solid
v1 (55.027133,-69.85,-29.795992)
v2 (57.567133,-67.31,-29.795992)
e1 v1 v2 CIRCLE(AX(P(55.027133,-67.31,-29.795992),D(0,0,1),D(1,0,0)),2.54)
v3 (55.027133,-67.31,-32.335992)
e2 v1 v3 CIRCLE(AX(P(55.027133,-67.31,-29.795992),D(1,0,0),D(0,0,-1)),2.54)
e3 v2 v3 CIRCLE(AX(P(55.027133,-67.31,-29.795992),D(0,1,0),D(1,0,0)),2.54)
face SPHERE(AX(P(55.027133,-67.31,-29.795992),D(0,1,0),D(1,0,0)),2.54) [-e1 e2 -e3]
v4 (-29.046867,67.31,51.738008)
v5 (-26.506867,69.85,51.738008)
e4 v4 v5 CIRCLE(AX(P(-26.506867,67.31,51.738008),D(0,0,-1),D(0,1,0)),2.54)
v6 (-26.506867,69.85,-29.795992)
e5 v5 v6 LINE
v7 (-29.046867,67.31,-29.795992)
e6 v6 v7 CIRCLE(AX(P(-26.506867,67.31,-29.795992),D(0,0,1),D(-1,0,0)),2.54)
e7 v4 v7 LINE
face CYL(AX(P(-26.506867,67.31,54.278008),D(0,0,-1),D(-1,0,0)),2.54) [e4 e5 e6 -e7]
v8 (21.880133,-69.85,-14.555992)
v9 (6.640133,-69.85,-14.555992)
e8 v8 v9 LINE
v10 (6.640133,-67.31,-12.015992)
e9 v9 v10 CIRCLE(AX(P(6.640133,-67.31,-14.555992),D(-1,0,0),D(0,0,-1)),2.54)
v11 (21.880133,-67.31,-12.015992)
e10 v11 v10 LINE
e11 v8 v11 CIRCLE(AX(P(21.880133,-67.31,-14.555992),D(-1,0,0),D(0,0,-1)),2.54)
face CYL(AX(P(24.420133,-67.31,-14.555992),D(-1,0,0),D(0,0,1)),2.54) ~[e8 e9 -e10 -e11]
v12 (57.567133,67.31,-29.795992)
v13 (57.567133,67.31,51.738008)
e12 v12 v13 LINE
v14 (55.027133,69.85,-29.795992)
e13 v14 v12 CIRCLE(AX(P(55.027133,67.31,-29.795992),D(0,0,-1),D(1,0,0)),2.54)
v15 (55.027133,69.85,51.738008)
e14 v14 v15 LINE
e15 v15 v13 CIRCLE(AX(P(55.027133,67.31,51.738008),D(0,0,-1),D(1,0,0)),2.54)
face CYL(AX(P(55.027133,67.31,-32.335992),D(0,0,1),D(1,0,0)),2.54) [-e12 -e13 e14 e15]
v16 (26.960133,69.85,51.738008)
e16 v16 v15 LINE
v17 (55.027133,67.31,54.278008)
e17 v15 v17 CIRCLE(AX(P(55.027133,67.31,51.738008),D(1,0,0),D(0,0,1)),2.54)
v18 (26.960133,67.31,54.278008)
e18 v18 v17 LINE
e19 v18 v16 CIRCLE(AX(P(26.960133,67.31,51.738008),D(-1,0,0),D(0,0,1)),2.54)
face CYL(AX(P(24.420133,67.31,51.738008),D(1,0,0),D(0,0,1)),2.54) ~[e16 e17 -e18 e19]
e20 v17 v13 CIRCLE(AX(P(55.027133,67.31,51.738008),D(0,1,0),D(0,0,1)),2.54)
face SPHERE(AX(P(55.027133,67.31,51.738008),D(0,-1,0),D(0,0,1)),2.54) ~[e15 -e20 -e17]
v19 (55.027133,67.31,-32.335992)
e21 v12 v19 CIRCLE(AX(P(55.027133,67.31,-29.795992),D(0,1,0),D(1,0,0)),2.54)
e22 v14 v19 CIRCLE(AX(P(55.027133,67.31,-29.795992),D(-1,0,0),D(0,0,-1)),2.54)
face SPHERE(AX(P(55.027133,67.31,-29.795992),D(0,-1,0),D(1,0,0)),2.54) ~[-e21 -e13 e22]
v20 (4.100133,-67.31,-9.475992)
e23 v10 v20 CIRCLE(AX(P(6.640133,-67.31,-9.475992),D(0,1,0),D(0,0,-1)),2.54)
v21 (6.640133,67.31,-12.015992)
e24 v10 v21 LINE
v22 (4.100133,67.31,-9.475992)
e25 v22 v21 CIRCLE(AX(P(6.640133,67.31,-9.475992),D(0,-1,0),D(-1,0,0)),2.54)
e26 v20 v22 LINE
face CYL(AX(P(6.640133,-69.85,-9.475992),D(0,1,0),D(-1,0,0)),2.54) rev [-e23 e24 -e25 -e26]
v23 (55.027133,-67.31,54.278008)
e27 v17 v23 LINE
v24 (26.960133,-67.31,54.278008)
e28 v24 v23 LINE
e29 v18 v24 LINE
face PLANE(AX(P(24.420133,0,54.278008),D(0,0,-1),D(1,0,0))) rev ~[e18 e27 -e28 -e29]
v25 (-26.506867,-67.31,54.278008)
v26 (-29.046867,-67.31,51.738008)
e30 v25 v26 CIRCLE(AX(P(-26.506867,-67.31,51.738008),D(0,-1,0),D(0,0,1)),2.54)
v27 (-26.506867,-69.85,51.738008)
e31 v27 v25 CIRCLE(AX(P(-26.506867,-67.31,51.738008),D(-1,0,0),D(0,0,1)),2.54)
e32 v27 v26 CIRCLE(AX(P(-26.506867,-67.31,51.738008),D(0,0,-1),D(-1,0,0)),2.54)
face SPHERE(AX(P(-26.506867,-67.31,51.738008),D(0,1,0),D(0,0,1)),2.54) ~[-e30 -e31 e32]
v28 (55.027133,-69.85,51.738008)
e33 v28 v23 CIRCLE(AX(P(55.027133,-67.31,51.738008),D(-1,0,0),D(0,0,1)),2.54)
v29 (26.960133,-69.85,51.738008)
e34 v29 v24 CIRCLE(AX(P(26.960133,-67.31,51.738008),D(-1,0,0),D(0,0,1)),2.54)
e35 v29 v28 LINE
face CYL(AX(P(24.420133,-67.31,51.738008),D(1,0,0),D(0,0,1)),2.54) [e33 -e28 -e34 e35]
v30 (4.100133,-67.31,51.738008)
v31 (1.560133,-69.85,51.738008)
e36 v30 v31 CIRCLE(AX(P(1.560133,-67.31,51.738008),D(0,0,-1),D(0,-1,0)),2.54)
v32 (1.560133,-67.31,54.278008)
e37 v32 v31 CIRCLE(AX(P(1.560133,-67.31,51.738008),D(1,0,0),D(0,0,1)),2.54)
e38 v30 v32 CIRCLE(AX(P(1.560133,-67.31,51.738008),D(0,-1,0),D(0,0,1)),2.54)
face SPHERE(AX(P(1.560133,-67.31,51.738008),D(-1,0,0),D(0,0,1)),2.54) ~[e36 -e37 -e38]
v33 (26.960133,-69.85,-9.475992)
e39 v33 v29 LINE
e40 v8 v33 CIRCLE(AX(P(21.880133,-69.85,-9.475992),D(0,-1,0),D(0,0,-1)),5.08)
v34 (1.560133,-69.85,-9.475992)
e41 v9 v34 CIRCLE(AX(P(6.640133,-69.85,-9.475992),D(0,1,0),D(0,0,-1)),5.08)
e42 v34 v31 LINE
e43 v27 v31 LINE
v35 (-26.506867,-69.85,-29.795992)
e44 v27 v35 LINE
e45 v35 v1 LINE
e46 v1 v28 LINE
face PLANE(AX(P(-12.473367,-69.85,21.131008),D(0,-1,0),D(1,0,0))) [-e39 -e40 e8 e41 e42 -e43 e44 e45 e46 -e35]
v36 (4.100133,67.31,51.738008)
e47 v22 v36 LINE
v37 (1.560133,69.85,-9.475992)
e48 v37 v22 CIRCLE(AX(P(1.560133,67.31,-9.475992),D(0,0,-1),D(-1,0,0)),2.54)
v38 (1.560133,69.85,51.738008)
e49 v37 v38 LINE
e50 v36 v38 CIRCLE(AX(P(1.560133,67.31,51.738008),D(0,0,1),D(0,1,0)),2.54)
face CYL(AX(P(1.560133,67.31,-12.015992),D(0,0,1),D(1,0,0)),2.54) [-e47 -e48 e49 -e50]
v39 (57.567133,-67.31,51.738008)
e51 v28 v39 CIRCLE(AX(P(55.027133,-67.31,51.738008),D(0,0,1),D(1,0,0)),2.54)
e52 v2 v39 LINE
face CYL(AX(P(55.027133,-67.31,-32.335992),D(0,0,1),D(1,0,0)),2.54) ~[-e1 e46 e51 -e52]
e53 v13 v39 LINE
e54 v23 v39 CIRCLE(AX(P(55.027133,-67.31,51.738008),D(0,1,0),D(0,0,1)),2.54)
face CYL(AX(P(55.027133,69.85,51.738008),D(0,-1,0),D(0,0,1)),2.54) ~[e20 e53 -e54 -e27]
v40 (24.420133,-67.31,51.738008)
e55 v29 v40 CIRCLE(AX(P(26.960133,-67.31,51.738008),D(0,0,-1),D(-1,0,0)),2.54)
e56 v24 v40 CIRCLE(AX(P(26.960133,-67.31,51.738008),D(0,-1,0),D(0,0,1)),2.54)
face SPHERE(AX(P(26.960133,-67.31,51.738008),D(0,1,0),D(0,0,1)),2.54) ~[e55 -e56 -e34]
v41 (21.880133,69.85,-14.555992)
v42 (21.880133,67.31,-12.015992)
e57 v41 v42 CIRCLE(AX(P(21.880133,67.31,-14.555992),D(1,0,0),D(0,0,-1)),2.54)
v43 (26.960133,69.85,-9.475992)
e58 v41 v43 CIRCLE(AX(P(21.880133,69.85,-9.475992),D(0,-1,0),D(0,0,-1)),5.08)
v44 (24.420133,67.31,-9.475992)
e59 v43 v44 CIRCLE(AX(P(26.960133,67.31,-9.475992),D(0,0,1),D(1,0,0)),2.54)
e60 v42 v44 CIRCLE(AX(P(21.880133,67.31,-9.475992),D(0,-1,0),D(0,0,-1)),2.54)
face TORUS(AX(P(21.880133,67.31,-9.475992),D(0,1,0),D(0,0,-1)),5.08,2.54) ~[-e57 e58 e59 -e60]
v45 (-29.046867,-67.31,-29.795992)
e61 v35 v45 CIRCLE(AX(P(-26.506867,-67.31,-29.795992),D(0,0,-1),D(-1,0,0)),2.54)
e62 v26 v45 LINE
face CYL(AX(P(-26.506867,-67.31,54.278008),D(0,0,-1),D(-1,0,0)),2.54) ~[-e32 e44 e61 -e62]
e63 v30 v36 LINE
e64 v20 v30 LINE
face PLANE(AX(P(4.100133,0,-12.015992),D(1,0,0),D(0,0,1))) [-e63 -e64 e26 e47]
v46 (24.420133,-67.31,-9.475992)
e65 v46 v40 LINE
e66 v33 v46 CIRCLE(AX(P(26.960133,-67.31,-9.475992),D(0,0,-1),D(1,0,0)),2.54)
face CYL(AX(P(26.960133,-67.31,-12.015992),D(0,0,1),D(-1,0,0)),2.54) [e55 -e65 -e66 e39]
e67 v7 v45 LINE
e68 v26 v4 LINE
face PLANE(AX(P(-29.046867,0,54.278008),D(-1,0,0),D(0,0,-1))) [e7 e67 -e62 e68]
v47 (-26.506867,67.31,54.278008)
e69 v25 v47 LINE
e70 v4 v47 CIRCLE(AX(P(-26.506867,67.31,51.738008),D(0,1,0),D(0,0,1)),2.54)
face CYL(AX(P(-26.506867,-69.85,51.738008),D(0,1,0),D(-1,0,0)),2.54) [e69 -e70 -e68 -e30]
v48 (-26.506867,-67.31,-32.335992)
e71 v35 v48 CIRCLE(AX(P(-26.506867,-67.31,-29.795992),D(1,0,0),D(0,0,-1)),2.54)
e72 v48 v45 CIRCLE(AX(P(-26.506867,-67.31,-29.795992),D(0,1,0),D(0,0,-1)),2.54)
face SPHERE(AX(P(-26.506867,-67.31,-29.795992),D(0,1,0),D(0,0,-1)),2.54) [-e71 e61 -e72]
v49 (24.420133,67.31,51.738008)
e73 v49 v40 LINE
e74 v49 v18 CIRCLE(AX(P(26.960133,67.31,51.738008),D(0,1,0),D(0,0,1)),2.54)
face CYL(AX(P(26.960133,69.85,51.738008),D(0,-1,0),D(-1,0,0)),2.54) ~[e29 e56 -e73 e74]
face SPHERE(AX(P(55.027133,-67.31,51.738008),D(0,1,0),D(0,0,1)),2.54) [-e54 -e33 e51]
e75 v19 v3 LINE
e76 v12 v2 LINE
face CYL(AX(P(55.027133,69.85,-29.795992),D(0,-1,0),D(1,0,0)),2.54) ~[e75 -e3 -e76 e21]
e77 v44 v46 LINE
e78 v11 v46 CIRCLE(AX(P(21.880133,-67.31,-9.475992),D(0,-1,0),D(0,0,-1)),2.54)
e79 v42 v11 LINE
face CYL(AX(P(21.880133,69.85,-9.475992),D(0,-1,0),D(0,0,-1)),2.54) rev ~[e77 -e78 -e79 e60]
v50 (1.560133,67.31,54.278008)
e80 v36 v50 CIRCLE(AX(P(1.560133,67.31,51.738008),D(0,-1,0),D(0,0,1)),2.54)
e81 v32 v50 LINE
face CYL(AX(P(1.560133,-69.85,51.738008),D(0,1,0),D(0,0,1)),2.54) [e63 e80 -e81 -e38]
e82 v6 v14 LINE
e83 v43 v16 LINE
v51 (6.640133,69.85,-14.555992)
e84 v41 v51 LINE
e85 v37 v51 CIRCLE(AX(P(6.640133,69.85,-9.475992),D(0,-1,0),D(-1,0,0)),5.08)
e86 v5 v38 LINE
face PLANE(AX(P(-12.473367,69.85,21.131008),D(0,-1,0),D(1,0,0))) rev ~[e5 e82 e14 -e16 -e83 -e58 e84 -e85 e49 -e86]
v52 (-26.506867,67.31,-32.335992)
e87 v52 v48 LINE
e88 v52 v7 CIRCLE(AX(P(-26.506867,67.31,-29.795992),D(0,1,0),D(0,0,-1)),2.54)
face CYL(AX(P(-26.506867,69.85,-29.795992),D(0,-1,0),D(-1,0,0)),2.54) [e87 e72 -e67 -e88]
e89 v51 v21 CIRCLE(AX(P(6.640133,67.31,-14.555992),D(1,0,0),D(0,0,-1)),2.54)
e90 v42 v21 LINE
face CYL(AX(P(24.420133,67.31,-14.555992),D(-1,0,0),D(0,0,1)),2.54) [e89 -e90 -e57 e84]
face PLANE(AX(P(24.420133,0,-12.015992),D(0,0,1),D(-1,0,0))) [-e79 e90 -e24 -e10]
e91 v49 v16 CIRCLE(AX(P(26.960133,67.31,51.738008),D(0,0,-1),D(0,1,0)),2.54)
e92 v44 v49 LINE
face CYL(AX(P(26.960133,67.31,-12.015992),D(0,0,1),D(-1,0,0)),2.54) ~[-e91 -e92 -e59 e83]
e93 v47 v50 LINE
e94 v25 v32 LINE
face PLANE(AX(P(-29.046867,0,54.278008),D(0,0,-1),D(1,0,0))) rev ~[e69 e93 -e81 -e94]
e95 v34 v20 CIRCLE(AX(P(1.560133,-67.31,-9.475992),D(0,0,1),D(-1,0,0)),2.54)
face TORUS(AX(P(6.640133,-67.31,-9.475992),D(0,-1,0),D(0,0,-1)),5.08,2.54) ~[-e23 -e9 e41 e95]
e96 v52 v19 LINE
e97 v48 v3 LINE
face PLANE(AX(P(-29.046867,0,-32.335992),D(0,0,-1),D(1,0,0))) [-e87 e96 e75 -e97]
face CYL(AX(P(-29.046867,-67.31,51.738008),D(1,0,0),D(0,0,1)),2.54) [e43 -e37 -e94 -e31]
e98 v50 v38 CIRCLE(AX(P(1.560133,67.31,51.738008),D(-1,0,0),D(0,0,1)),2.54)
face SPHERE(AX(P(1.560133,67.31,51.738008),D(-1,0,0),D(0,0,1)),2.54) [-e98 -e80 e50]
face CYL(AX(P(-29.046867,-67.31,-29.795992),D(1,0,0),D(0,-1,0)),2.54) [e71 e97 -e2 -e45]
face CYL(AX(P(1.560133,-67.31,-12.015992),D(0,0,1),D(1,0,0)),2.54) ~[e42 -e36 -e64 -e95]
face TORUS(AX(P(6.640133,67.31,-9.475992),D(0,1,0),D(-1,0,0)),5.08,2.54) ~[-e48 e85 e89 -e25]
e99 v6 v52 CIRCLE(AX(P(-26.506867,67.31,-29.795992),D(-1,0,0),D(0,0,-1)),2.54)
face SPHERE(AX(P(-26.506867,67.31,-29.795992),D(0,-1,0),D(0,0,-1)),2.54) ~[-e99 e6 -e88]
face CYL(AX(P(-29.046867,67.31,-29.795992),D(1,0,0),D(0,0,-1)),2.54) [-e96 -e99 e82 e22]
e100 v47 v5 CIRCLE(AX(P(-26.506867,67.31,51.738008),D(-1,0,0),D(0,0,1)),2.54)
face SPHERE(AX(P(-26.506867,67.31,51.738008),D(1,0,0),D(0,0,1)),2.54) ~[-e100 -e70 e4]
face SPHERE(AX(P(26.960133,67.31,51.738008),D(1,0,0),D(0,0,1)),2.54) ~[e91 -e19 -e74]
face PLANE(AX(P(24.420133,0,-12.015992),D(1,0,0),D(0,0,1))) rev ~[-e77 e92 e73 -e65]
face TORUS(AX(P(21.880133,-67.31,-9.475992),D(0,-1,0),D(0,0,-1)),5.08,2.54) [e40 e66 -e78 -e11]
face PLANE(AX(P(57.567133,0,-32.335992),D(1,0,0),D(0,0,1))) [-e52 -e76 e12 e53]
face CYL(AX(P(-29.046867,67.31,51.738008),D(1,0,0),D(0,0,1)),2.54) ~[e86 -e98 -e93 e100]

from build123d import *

# Parameters (mm, degrees)
F0_W     = 33.147
F0_H     = 66.294
F1_DEPTH = 69.85
F2_R     = 2.54


with BuildPart() as f1:
    # F0 (on Front) → F1 (new body, symmetric)
    with BuildSketch(Plane.XZ):
        with Locations((-12.4733666049, 21.13100771)):
            Rectangle(F0_W, F0_H)
        Polygon((57.5671333951, -32.33599229), (57.5671333951, -12.01599229), (24.4201333951, -12.01599229), (4.1001333951, -12.01599229), (-29.0468666049, -12.01599229), (-29.0468666049, -32.33599229), align=None)
        with Locations((40.9936333951, 21.13100771)):
            Rectangle(F0_W, F0_H)
    extrude(amount=F1_DEPTH, both=True)

    # F2
    f2_edges = [f1.edges().sort_by_distance(p)[0] for p in [
        (-12.473367, 69.85, 54.278008),
        (-29.046867, 0, 54.278008),
        (-12.473367, -69.85, 54.278008),
        (4.100133, 0, 54.278008),
        (57.567133, 0, 54.278008),
        (40.993633, 69.85, 54.278008),
        (24.420133, 0, 54.278008),
        (40.993633, -69.85, 54.278008),
        (57.567133, 0, -32.335992),
        (57.567133, 69.85, 10.971008),
        (57.567133, -69.85, 10.971008),
        (24.420133, 0, -12.015992),
        (14.260133, 69.85, -12.015992),
        (4.100133, 0, -12.015992),
        (14.260133, -69.85, -12.015992),
        (4.100133, 69.85, 21.131008),
        (4.100133, -69.85, 21.131008),
        (-29.046867, 0, -32.335992),
        (14.260133, 69.85, -32.335992),
        (14.260133, -69.85, -32.335992),
        (-29.046867, 69.85, 10.971008),
        (-29.046867, -69.85, 10.971008),
        (24.420133, 69.85, 21.131008),
        (24.420133, -69.85, 21.131008),
    ]]
    fillet(f2_edges, radius=F2_R)


solid = f1.part
